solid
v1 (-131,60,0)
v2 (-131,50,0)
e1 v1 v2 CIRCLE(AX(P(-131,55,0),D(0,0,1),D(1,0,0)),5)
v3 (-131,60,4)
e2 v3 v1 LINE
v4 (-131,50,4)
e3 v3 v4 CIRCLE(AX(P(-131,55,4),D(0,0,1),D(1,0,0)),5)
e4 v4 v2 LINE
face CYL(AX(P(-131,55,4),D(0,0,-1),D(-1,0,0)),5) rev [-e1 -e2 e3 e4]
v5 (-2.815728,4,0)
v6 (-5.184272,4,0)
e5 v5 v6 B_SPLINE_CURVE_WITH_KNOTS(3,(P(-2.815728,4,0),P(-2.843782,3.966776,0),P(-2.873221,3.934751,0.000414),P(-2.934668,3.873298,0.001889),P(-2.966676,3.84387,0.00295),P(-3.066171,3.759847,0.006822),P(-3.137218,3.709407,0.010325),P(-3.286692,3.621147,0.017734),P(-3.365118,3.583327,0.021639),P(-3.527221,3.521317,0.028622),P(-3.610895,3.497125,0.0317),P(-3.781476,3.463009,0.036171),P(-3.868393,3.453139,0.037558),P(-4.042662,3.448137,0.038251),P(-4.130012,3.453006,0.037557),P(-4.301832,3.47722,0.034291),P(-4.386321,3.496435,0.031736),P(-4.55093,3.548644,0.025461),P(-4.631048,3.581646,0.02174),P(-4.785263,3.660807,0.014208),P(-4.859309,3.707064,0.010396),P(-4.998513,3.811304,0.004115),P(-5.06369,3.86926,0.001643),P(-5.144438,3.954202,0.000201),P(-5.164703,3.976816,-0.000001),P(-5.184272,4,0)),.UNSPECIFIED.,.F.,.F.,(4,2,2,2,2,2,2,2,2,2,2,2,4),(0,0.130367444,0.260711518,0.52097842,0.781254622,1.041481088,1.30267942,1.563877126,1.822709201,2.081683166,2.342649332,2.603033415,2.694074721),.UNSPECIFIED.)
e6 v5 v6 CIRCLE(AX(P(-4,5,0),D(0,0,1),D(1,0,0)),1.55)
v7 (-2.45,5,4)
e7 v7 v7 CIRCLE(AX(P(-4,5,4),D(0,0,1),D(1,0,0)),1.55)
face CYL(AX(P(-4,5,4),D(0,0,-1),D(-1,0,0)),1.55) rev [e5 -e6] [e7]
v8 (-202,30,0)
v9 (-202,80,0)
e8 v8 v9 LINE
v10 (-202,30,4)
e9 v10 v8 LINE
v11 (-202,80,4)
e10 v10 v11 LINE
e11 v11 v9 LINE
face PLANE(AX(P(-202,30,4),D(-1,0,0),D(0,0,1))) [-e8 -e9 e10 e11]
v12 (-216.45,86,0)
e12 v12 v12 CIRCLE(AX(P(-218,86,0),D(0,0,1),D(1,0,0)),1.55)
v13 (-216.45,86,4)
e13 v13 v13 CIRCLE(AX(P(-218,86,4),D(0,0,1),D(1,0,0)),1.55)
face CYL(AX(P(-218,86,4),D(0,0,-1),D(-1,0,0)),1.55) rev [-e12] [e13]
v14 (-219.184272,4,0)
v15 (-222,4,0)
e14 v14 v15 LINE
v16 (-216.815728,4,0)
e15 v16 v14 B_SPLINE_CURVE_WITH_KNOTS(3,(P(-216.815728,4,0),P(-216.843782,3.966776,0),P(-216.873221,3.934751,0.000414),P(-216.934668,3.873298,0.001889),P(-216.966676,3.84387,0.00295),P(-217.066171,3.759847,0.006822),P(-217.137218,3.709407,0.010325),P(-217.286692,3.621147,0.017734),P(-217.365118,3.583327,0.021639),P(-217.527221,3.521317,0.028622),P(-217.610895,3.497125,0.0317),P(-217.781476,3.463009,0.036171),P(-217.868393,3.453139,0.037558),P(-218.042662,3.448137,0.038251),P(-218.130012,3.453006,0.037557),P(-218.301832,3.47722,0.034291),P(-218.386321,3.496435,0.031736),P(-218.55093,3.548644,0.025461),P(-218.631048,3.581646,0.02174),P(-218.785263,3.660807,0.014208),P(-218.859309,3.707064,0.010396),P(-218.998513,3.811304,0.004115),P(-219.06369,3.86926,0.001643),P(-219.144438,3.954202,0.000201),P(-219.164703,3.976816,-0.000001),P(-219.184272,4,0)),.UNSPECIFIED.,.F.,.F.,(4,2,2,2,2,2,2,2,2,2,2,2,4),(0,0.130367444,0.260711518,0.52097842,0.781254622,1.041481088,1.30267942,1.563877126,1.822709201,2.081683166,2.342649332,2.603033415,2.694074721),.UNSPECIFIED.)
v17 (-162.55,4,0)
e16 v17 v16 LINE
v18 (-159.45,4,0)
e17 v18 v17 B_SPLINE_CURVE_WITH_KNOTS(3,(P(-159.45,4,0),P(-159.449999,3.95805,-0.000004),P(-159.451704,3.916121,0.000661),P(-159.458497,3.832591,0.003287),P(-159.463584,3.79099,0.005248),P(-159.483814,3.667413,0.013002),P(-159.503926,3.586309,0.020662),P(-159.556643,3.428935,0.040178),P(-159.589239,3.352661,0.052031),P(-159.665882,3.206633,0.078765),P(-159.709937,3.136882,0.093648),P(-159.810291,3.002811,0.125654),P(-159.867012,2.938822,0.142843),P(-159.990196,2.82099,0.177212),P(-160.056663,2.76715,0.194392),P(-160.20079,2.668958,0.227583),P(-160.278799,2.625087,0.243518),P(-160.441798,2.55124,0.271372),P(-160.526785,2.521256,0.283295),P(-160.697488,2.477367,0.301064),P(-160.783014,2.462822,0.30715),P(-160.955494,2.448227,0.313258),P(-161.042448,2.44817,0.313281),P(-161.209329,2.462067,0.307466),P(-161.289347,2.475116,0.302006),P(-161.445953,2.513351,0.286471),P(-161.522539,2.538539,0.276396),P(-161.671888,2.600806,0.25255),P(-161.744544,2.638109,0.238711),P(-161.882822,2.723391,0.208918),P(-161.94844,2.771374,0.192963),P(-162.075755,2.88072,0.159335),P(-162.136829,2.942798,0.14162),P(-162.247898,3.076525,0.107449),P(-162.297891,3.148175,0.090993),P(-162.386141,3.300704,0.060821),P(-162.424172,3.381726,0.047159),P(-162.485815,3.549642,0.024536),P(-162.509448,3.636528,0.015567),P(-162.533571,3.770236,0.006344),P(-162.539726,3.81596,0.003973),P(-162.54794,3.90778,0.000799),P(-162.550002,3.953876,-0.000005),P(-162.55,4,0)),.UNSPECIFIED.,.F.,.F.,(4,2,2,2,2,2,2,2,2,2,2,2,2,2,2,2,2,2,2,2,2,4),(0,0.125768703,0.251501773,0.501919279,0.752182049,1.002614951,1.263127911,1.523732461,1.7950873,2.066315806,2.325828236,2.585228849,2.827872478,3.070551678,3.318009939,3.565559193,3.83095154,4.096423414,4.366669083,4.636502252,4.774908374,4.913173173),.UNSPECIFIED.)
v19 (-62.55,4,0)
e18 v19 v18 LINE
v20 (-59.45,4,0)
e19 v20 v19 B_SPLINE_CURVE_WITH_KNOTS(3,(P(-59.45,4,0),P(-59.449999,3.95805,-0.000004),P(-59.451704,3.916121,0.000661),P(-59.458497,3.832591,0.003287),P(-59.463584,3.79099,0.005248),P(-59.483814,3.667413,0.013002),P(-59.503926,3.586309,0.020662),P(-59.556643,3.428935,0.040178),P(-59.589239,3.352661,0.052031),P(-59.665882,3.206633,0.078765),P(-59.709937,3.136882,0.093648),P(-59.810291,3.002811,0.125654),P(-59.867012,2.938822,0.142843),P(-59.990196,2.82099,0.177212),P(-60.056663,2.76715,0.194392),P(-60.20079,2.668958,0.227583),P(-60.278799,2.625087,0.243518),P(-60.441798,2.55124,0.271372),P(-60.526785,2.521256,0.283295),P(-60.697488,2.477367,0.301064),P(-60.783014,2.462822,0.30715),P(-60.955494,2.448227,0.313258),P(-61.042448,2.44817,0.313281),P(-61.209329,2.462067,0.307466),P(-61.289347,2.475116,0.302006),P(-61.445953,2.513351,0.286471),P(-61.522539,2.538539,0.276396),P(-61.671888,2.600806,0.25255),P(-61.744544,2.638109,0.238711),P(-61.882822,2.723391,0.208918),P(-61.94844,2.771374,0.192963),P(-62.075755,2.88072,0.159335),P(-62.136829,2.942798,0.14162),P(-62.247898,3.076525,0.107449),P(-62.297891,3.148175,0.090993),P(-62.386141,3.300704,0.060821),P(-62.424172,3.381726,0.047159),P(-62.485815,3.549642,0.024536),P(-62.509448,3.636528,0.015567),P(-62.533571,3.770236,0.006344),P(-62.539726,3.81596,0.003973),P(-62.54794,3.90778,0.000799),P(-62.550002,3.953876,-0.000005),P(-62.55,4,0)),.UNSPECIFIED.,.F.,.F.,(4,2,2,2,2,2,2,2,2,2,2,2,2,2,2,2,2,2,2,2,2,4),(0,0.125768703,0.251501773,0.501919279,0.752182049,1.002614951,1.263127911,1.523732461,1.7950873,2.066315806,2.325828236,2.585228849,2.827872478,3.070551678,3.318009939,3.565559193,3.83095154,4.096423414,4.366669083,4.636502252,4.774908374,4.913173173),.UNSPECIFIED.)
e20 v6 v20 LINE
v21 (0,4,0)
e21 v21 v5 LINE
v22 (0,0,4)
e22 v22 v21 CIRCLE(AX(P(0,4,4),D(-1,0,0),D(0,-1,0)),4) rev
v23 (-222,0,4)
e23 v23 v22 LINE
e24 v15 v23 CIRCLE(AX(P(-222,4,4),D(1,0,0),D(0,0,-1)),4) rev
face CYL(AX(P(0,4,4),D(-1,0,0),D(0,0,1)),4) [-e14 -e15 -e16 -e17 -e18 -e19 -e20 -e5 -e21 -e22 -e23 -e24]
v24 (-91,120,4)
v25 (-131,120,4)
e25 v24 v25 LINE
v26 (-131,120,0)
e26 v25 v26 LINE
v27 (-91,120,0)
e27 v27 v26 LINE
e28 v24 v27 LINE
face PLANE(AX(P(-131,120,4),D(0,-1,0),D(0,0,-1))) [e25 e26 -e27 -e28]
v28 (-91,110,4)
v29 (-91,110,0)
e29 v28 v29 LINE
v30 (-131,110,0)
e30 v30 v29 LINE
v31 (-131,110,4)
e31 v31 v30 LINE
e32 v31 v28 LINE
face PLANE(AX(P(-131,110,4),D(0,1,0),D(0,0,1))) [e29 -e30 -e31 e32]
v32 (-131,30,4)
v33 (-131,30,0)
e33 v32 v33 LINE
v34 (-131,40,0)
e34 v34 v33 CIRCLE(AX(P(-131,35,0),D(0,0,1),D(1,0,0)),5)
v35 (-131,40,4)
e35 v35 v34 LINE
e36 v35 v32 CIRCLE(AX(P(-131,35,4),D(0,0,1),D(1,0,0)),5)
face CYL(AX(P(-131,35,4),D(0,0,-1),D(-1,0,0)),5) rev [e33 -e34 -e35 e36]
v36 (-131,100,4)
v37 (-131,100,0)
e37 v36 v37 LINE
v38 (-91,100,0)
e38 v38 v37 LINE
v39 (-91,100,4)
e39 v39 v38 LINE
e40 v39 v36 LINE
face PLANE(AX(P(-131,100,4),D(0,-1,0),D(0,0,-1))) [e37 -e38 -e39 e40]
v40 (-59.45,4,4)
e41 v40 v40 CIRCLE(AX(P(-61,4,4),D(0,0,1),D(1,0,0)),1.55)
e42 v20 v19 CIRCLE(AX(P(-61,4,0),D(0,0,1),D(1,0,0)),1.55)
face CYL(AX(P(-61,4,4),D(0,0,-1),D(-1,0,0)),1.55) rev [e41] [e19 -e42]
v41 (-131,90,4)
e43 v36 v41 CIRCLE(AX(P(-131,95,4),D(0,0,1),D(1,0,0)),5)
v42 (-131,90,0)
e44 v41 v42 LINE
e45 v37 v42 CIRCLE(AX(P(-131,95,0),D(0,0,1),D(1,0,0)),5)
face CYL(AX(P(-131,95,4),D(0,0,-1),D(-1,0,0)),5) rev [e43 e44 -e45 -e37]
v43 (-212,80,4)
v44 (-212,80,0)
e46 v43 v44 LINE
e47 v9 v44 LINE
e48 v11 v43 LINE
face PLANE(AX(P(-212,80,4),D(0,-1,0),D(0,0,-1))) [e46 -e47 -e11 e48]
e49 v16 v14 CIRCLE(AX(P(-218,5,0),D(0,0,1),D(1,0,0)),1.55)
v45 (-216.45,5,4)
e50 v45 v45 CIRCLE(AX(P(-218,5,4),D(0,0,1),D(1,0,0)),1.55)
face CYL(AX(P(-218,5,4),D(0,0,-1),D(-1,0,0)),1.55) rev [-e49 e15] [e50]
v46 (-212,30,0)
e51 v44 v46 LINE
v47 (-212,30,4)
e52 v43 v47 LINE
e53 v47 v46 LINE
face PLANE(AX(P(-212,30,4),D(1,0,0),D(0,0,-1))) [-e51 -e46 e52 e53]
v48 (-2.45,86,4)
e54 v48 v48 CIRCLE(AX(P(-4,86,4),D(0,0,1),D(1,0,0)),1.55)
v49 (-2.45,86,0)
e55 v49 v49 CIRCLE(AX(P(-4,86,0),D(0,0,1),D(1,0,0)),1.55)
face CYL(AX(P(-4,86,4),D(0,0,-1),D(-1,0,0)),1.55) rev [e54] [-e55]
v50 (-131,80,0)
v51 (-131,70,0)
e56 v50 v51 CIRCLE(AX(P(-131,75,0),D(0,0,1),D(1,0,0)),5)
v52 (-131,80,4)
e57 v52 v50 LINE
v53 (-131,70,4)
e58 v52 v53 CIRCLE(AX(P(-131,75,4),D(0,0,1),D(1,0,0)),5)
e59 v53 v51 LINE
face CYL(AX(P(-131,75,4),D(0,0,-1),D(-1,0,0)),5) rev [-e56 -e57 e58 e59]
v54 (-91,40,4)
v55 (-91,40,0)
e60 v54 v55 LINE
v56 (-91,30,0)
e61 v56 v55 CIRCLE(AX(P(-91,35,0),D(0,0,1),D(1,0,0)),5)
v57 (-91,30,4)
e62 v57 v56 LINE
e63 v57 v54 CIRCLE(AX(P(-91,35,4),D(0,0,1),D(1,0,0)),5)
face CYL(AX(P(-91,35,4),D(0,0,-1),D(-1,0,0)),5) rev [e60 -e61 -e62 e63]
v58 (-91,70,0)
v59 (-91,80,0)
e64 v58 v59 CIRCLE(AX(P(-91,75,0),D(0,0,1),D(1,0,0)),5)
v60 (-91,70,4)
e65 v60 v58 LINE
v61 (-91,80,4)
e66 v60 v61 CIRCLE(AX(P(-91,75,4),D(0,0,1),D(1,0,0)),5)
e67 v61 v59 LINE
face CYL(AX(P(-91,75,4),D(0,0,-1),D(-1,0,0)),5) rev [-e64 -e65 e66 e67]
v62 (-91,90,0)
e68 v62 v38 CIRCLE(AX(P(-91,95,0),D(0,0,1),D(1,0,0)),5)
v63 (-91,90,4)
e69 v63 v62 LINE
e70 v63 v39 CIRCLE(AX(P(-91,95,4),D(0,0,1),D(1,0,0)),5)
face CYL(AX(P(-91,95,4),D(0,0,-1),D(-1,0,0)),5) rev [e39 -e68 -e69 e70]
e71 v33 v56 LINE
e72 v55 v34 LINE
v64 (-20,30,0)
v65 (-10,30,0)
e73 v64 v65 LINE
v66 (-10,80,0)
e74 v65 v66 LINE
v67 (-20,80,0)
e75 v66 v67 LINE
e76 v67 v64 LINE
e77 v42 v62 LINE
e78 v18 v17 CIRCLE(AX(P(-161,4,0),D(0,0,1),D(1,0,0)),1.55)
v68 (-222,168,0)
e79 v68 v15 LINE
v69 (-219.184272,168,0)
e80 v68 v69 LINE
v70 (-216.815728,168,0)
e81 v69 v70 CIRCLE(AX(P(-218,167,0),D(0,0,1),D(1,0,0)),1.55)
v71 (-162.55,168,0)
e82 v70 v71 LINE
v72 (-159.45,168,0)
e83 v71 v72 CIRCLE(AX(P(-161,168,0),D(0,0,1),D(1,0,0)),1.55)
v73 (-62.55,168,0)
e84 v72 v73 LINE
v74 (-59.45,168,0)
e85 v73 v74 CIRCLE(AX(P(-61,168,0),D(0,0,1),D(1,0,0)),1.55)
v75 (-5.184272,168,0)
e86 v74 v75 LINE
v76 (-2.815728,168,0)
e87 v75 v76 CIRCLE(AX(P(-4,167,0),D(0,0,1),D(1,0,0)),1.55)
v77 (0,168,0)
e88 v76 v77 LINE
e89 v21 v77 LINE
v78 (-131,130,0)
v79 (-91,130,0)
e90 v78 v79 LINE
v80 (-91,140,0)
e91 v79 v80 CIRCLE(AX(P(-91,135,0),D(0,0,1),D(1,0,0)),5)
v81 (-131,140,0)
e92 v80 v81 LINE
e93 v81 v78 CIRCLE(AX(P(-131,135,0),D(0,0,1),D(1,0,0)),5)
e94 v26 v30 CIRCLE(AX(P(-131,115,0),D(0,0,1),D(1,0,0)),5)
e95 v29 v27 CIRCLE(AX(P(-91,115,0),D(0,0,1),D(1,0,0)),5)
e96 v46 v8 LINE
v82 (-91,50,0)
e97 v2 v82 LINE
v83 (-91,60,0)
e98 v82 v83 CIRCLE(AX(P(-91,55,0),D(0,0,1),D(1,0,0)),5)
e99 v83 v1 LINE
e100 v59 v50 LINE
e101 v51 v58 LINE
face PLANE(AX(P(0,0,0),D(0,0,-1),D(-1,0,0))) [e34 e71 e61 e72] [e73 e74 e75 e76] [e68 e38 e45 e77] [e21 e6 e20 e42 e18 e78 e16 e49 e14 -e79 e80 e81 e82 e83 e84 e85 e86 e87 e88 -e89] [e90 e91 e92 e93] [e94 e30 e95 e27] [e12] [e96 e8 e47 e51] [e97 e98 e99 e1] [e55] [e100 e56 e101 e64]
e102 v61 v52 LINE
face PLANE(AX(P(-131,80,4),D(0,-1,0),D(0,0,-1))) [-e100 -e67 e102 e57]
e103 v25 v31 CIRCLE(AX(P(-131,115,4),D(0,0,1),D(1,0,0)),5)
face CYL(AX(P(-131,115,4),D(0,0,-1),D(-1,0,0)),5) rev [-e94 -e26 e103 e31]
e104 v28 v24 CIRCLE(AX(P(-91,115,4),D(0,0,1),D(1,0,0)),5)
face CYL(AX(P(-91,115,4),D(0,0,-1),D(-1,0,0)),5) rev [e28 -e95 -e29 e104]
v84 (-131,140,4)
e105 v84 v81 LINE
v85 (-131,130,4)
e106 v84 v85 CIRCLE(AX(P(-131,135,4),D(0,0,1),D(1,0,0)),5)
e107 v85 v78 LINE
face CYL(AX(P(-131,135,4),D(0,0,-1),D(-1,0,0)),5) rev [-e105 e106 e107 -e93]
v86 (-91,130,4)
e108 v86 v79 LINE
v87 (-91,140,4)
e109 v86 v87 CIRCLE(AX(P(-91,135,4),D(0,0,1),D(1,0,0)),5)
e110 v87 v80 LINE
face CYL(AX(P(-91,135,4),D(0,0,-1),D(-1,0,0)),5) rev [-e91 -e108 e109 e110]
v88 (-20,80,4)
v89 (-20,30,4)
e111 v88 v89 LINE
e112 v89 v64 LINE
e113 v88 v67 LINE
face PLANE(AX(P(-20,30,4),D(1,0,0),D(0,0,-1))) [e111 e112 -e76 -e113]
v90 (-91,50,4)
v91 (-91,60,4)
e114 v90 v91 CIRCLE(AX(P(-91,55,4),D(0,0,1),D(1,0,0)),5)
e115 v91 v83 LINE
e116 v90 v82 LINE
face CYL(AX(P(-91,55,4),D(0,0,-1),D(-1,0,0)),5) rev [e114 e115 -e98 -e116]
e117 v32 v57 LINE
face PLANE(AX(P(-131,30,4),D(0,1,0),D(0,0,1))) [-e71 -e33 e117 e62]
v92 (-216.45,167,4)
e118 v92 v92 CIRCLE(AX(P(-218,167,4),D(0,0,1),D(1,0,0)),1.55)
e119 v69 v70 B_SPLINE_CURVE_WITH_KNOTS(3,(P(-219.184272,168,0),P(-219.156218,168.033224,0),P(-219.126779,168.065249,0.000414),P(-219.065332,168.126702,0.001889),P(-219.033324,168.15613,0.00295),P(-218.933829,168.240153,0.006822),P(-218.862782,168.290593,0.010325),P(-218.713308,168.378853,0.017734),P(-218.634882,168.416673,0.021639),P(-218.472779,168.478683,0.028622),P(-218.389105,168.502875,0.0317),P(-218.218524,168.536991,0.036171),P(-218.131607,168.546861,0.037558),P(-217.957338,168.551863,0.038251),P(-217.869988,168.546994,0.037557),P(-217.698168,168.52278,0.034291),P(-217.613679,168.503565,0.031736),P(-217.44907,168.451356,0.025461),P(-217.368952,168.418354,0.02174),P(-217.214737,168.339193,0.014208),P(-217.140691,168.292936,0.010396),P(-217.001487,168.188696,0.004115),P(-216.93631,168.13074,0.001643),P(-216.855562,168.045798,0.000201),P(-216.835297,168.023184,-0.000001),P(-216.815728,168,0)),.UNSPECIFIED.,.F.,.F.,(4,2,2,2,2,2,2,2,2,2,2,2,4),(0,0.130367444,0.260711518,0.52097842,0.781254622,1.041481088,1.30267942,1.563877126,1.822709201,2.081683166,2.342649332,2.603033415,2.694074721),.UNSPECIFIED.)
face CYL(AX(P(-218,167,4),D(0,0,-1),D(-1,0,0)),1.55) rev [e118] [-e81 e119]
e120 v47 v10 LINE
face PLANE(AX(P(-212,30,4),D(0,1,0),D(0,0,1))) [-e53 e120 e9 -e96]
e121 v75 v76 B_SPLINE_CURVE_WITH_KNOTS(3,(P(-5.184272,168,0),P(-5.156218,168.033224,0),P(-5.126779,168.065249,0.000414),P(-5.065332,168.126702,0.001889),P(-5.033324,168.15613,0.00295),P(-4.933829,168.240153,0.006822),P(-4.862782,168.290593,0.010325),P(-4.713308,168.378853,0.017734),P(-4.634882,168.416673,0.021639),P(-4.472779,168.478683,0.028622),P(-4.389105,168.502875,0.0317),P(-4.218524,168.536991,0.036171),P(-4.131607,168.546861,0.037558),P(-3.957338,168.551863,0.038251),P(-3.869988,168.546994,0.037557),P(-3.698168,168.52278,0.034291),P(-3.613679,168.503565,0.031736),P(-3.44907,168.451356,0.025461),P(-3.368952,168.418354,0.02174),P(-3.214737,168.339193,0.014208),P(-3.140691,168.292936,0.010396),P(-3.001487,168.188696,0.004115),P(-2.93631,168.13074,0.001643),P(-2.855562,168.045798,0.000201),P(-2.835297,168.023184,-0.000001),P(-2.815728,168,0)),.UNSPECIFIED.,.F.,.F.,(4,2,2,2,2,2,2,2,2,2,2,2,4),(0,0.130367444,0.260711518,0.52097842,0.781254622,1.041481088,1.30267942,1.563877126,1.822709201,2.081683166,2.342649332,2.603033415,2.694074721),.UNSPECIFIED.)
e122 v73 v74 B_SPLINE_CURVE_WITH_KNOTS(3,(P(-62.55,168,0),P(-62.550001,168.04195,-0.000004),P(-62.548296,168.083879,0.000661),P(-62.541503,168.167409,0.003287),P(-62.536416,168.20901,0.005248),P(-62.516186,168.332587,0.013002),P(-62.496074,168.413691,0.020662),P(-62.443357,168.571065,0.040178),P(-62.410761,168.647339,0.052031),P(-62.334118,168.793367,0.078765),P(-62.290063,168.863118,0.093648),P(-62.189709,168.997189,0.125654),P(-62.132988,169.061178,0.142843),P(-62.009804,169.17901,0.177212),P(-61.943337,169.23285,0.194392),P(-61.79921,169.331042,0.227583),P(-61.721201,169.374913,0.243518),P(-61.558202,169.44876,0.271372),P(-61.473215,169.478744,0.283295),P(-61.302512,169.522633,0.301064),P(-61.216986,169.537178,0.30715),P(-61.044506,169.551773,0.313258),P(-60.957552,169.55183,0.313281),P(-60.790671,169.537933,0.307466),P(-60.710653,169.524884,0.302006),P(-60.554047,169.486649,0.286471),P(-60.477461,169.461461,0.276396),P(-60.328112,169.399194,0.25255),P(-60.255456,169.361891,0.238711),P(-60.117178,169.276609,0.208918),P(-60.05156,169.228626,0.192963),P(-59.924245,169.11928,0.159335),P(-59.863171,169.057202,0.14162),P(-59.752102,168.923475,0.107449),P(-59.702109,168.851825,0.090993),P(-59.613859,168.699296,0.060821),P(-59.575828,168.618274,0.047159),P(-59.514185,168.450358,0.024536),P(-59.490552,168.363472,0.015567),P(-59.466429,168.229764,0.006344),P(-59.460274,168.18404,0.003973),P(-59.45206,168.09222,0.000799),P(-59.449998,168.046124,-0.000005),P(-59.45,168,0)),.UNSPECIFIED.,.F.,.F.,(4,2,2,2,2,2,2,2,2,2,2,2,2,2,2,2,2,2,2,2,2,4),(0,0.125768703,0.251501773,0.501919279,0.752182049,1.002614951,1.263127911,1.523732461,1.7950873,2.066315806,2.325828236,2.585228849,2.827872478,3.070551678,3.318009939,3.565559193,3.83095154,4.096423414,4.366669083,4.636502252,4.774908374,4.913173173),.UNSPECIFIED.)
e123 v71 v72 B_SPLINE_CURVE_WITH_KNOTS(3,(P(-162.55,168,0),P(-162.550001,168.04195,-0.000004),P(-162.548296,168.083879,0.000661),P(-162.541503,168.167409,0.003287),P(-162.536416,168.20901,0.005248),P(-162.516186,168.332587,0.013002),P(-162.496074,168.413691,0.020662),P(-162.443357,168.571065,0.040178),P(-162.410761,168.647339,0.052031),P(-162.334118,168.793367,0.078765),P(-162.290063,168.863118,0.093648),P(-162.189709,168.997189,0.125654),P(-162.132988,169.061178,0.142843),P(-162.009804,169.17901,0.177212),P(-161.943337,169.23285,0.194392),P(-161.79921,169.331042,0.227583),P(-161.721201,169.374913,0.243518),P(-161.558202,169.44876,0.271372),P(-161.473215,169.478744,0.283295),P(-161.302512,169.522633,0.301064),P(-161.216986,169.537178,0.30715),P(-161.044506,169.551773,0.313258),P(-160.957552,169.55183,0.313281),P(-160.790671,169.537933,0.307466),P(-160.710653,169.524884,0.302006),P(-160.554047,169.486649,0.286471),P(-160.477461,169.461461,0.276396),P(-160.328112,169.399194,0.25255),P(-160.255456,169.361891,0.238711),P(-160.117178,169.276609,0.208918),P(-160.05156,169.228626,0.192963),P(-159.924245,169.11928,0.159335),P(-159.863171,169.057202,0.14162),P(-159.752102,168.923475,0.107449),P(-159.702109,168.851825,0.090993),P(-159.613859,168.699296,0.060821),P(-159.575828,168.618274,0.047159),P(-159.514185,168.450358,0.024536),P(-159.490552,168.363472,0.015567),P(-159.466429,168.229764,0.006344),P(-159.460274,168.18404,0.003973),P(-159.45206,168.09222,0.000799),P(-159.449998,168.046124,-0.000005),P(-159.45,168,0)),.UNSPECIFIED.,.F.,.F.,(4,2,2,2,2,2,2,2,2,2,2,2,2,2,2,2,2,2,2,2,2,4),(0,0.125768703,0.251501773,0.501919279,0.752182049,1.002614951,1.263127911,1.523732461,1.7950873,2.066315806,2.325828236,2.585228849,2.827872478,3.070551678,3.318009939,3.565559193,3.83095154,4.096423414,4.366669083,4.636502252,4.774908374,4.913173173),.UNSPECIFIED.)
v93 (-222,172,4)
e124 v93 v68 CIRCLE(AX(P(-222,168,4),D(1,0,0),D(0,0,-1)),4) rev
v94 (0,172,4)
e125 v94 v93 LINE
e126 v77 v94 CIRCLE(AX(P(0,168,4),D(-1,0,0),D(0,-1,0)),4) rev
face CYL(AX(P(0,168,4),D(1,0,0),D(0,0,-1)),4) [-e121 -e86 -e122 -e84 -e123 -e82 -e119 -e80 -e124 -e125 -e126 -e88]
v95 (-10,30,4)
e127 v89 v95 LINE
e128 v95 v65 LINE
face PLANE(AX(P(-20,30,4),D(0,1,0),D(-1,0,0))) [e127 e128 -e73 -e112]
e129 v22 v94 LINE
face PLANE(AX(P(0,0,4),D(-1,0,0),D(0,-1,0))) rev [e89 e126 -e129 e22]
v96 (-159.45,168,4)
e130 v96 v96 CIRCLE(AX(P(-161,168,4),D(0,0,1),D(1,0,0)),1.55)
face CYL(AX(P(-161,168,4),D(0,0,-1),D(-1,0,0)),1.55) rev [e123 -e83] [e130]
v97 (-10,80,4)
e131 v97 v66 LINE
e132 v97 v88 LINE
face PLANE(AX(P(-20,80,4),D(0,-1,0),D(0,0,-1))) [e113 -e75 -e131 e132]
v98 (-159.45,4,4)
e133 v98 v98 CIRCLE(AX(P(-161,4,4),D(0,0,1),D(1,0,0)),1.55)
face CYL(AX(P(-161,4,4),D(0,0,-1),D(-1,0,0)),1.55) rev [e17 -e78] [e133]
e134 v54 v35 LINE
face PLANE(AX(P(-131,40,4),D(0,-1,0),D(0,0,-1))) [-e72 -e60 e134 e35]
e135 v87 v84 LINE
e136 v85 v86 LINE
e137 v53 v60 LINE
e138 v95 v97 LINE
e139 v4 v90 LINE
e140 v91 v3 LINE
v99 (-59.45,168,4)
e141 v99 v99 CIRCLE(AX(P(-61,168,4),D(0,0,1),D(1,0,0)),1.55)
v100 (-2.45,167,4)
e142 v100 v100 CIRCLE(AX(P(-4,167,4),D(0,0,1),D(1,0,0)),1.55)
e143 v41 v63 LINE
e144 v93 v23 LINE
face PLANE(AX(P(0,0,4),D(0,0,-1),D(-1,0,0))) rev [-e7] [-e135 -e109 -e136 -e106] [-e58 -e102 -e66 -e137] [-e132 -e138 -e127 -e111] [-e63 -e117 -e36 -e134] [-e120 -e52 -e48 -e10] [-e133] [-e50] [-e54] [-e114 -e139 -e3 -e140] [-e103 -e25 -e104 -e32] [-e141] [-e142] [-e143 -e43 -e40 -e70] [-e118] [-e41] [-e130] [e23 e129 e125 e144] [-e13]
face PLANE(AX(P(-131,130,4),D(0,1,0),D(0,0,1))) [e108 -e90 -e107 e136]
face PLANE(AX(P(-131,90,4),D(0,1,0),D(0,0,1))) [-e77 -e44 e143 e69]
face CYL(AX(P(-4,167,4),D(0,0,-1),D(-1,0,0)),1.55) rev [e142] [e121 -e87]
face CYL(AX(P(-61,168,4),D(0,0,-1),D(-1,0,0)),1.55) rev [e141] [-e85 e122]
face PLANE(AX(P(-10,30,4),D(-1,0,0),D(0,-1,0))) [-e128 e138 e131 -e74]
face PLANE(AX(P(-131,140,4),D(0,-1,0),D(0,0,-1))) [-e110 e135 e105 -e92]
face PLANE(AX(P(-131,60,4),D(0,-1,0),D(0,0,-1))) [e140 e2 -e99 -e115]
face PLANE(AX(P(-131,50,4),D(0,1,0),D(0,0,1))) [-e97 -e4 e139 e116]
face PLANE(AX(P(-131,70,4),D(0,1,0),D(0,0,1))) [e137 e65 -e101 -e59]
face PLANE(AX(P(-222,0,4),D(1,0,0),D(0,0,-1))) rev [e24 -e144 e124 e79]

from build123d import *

# Parameters (mm, degrees)
SKETCH1_W           = 172
SKETCH1_H           = 222
SKETCH1_R           = 1.55
SKETCH1_W_2         = 50
SKETCH1_H_2         = 10
BOSS_EXTRUDE2_DEPTH = 4
FILLET1_R           = 4


with BuildPart() as part:
    # Sketch1 → Boss-Extrude2 (new body)
    with BuildSketch(Plane(origin=(0, 0, 0), x_dir=(0, 1, 0), z_dir=(0, 0, 1))):
        with Locations((86, 111)):
            Rectangle(SKETCH1_W, SKETCH1_H)
        with Locations(Location((5, 4, 0), (0, 0, 270))):
            Circle(SKETCH1_R, mode=Mode.SUBTRACT)
        with Locations(Location((5, 218, 0), (0, 0, 270))):
            Circle(SKETCH1_R, mode=Mode.SUBTRACT)
        with Locations(Location((167, 218, 0), (0, 0, 270))):
            Circle(SKETCH1_R, mode=Mode.SUBTRACT)
        with Locations(Location((167, 4, 0), (0, 0, 270))):
            Circle(SKETCH1_R, mode=Mode.SUBTRACT)
        with Locations(Location((86, 218, 0), (0, 0, 270))):
            Circle(SKETCH1_R, mode=Mode.SUBTRACT)
        with Locations(Location((86, 4, 0), (0, 0, 270))):
            Circle(SKETCH1_R, mode=Mode.SUBTRACT)
        with Locations(Location((4, 61, 0), (0, 0, 270))):
            Circle(SKETCH1_R, mode=Mode.SUBTRACT)
        with Locations(Location((168, 61, 0), (0, 0, 270))):
            Circle(SKETCH1_R, mode=Mode.SUBTRACT)
        with Locations(Location((168, 161, 0), (0, 0, 270))):
            Circle(SKETCH1_R, mode=Mode.SUBTRACT)
        with Locations(Location((4, 161, 0), (0, 0, 270))):
            Circle(SKETCH1_R, mode=Mode.SUBTRACT)
        with Locations((55, 207)):
            Rectangle(SKETCH1_W_2, SKETCH1_H_2, mode=Mode.SUBTRACT)
        with Locations((55, 15)):
            Rectangle(SKETCH1_W_2, SKETCH1_H_2, mode=Mode.SUBTRACT)
        with BuildLine():
            Line((40, 131), (40, 91))
            ThreePointArc((40, 91), (35, 86), (30, 91))
            Line((30, 91), (30, 131))
            ThreePointArc((30, 131), (35, 136), (40, 131))
        make_face(mode=Mode.SUBTRACT)
        with BuildLine():
            Line((60, 131), (60, 91))
            ThreePointArc((60, 91), (55, 86), (50, 91))
            Line((50, 91), (50, 131))
            ThreePointArc((50, 131), (55, 136), (60, 131))
        make_face(mode=Mode.SUBTRACT)
        with BuildLine():
            Line((80, 131), (80, 91))
            ThreePointArc((80, 91), (75, 86), (70, 91))
            Line((70, 91), (70, 131))
            ThreePointArc((70, 131), (75, 136), (80, 131))
        make_face(mode=Mode.SUBTRACT)
        with BuildLine():
            Line((100, 131), (100, 91))
            ThreePointArc((100, 91), (95, 86), (90, 91))
            Line((90, 91), (90, 131))
            ThreePointArc((90, 131), (95, 136), (100, 131))
        make_face(mode=Mode.SUBTRACT)
        with BuildLine():
            Line((120, 131), (120, 91))
            ThreePointArc((120, 91), (115, 86), (110, 91))
            Line((110, 91), (110, 131))
            ThreePointArc((110, 131), (115, 136), (120, 131))
        make_face(mode=Mode.SUBTRACT)
        with BuildLine():
            Line((140, 131), (140, 91))
            ThreePointArc((140, 91), (135, 86), (130, 91))
            Line((130, 91), (130, 131))
            ThreePointArc((130, 131), (135, 136), (140, 131))
        make_face(mode=Mode.SUBTRACT)
    extrude(amount=BOSS_EXTRUDE2_DEPTH)

    # Fillet1
    # the kernel refuses this fillet: 4 mm, written as the material it takes off along each edge
    with BuildSketch(Plane(origin=(10, 172, 0), x_dir=(0, 0, 1), z_dir=(-1, 0, 0)), Plane(origin=(-232, 0, 0), x_dir=(0, 0, 1), z_dir=(1, 0, 0))) as fillet1_piece_1:
        with BuildLine():
            CenterArc((FILLET1_R, -FILLET1_R), FILLET1_R, 90, 90)
            Line((0, -FILLET1_R), (0, 0))
            Line((0, 0), (FILLET1_R, 0))
        make_face()
    extrude(amount=242, mode=Mode.SUBTRACT)


solid = part.part
